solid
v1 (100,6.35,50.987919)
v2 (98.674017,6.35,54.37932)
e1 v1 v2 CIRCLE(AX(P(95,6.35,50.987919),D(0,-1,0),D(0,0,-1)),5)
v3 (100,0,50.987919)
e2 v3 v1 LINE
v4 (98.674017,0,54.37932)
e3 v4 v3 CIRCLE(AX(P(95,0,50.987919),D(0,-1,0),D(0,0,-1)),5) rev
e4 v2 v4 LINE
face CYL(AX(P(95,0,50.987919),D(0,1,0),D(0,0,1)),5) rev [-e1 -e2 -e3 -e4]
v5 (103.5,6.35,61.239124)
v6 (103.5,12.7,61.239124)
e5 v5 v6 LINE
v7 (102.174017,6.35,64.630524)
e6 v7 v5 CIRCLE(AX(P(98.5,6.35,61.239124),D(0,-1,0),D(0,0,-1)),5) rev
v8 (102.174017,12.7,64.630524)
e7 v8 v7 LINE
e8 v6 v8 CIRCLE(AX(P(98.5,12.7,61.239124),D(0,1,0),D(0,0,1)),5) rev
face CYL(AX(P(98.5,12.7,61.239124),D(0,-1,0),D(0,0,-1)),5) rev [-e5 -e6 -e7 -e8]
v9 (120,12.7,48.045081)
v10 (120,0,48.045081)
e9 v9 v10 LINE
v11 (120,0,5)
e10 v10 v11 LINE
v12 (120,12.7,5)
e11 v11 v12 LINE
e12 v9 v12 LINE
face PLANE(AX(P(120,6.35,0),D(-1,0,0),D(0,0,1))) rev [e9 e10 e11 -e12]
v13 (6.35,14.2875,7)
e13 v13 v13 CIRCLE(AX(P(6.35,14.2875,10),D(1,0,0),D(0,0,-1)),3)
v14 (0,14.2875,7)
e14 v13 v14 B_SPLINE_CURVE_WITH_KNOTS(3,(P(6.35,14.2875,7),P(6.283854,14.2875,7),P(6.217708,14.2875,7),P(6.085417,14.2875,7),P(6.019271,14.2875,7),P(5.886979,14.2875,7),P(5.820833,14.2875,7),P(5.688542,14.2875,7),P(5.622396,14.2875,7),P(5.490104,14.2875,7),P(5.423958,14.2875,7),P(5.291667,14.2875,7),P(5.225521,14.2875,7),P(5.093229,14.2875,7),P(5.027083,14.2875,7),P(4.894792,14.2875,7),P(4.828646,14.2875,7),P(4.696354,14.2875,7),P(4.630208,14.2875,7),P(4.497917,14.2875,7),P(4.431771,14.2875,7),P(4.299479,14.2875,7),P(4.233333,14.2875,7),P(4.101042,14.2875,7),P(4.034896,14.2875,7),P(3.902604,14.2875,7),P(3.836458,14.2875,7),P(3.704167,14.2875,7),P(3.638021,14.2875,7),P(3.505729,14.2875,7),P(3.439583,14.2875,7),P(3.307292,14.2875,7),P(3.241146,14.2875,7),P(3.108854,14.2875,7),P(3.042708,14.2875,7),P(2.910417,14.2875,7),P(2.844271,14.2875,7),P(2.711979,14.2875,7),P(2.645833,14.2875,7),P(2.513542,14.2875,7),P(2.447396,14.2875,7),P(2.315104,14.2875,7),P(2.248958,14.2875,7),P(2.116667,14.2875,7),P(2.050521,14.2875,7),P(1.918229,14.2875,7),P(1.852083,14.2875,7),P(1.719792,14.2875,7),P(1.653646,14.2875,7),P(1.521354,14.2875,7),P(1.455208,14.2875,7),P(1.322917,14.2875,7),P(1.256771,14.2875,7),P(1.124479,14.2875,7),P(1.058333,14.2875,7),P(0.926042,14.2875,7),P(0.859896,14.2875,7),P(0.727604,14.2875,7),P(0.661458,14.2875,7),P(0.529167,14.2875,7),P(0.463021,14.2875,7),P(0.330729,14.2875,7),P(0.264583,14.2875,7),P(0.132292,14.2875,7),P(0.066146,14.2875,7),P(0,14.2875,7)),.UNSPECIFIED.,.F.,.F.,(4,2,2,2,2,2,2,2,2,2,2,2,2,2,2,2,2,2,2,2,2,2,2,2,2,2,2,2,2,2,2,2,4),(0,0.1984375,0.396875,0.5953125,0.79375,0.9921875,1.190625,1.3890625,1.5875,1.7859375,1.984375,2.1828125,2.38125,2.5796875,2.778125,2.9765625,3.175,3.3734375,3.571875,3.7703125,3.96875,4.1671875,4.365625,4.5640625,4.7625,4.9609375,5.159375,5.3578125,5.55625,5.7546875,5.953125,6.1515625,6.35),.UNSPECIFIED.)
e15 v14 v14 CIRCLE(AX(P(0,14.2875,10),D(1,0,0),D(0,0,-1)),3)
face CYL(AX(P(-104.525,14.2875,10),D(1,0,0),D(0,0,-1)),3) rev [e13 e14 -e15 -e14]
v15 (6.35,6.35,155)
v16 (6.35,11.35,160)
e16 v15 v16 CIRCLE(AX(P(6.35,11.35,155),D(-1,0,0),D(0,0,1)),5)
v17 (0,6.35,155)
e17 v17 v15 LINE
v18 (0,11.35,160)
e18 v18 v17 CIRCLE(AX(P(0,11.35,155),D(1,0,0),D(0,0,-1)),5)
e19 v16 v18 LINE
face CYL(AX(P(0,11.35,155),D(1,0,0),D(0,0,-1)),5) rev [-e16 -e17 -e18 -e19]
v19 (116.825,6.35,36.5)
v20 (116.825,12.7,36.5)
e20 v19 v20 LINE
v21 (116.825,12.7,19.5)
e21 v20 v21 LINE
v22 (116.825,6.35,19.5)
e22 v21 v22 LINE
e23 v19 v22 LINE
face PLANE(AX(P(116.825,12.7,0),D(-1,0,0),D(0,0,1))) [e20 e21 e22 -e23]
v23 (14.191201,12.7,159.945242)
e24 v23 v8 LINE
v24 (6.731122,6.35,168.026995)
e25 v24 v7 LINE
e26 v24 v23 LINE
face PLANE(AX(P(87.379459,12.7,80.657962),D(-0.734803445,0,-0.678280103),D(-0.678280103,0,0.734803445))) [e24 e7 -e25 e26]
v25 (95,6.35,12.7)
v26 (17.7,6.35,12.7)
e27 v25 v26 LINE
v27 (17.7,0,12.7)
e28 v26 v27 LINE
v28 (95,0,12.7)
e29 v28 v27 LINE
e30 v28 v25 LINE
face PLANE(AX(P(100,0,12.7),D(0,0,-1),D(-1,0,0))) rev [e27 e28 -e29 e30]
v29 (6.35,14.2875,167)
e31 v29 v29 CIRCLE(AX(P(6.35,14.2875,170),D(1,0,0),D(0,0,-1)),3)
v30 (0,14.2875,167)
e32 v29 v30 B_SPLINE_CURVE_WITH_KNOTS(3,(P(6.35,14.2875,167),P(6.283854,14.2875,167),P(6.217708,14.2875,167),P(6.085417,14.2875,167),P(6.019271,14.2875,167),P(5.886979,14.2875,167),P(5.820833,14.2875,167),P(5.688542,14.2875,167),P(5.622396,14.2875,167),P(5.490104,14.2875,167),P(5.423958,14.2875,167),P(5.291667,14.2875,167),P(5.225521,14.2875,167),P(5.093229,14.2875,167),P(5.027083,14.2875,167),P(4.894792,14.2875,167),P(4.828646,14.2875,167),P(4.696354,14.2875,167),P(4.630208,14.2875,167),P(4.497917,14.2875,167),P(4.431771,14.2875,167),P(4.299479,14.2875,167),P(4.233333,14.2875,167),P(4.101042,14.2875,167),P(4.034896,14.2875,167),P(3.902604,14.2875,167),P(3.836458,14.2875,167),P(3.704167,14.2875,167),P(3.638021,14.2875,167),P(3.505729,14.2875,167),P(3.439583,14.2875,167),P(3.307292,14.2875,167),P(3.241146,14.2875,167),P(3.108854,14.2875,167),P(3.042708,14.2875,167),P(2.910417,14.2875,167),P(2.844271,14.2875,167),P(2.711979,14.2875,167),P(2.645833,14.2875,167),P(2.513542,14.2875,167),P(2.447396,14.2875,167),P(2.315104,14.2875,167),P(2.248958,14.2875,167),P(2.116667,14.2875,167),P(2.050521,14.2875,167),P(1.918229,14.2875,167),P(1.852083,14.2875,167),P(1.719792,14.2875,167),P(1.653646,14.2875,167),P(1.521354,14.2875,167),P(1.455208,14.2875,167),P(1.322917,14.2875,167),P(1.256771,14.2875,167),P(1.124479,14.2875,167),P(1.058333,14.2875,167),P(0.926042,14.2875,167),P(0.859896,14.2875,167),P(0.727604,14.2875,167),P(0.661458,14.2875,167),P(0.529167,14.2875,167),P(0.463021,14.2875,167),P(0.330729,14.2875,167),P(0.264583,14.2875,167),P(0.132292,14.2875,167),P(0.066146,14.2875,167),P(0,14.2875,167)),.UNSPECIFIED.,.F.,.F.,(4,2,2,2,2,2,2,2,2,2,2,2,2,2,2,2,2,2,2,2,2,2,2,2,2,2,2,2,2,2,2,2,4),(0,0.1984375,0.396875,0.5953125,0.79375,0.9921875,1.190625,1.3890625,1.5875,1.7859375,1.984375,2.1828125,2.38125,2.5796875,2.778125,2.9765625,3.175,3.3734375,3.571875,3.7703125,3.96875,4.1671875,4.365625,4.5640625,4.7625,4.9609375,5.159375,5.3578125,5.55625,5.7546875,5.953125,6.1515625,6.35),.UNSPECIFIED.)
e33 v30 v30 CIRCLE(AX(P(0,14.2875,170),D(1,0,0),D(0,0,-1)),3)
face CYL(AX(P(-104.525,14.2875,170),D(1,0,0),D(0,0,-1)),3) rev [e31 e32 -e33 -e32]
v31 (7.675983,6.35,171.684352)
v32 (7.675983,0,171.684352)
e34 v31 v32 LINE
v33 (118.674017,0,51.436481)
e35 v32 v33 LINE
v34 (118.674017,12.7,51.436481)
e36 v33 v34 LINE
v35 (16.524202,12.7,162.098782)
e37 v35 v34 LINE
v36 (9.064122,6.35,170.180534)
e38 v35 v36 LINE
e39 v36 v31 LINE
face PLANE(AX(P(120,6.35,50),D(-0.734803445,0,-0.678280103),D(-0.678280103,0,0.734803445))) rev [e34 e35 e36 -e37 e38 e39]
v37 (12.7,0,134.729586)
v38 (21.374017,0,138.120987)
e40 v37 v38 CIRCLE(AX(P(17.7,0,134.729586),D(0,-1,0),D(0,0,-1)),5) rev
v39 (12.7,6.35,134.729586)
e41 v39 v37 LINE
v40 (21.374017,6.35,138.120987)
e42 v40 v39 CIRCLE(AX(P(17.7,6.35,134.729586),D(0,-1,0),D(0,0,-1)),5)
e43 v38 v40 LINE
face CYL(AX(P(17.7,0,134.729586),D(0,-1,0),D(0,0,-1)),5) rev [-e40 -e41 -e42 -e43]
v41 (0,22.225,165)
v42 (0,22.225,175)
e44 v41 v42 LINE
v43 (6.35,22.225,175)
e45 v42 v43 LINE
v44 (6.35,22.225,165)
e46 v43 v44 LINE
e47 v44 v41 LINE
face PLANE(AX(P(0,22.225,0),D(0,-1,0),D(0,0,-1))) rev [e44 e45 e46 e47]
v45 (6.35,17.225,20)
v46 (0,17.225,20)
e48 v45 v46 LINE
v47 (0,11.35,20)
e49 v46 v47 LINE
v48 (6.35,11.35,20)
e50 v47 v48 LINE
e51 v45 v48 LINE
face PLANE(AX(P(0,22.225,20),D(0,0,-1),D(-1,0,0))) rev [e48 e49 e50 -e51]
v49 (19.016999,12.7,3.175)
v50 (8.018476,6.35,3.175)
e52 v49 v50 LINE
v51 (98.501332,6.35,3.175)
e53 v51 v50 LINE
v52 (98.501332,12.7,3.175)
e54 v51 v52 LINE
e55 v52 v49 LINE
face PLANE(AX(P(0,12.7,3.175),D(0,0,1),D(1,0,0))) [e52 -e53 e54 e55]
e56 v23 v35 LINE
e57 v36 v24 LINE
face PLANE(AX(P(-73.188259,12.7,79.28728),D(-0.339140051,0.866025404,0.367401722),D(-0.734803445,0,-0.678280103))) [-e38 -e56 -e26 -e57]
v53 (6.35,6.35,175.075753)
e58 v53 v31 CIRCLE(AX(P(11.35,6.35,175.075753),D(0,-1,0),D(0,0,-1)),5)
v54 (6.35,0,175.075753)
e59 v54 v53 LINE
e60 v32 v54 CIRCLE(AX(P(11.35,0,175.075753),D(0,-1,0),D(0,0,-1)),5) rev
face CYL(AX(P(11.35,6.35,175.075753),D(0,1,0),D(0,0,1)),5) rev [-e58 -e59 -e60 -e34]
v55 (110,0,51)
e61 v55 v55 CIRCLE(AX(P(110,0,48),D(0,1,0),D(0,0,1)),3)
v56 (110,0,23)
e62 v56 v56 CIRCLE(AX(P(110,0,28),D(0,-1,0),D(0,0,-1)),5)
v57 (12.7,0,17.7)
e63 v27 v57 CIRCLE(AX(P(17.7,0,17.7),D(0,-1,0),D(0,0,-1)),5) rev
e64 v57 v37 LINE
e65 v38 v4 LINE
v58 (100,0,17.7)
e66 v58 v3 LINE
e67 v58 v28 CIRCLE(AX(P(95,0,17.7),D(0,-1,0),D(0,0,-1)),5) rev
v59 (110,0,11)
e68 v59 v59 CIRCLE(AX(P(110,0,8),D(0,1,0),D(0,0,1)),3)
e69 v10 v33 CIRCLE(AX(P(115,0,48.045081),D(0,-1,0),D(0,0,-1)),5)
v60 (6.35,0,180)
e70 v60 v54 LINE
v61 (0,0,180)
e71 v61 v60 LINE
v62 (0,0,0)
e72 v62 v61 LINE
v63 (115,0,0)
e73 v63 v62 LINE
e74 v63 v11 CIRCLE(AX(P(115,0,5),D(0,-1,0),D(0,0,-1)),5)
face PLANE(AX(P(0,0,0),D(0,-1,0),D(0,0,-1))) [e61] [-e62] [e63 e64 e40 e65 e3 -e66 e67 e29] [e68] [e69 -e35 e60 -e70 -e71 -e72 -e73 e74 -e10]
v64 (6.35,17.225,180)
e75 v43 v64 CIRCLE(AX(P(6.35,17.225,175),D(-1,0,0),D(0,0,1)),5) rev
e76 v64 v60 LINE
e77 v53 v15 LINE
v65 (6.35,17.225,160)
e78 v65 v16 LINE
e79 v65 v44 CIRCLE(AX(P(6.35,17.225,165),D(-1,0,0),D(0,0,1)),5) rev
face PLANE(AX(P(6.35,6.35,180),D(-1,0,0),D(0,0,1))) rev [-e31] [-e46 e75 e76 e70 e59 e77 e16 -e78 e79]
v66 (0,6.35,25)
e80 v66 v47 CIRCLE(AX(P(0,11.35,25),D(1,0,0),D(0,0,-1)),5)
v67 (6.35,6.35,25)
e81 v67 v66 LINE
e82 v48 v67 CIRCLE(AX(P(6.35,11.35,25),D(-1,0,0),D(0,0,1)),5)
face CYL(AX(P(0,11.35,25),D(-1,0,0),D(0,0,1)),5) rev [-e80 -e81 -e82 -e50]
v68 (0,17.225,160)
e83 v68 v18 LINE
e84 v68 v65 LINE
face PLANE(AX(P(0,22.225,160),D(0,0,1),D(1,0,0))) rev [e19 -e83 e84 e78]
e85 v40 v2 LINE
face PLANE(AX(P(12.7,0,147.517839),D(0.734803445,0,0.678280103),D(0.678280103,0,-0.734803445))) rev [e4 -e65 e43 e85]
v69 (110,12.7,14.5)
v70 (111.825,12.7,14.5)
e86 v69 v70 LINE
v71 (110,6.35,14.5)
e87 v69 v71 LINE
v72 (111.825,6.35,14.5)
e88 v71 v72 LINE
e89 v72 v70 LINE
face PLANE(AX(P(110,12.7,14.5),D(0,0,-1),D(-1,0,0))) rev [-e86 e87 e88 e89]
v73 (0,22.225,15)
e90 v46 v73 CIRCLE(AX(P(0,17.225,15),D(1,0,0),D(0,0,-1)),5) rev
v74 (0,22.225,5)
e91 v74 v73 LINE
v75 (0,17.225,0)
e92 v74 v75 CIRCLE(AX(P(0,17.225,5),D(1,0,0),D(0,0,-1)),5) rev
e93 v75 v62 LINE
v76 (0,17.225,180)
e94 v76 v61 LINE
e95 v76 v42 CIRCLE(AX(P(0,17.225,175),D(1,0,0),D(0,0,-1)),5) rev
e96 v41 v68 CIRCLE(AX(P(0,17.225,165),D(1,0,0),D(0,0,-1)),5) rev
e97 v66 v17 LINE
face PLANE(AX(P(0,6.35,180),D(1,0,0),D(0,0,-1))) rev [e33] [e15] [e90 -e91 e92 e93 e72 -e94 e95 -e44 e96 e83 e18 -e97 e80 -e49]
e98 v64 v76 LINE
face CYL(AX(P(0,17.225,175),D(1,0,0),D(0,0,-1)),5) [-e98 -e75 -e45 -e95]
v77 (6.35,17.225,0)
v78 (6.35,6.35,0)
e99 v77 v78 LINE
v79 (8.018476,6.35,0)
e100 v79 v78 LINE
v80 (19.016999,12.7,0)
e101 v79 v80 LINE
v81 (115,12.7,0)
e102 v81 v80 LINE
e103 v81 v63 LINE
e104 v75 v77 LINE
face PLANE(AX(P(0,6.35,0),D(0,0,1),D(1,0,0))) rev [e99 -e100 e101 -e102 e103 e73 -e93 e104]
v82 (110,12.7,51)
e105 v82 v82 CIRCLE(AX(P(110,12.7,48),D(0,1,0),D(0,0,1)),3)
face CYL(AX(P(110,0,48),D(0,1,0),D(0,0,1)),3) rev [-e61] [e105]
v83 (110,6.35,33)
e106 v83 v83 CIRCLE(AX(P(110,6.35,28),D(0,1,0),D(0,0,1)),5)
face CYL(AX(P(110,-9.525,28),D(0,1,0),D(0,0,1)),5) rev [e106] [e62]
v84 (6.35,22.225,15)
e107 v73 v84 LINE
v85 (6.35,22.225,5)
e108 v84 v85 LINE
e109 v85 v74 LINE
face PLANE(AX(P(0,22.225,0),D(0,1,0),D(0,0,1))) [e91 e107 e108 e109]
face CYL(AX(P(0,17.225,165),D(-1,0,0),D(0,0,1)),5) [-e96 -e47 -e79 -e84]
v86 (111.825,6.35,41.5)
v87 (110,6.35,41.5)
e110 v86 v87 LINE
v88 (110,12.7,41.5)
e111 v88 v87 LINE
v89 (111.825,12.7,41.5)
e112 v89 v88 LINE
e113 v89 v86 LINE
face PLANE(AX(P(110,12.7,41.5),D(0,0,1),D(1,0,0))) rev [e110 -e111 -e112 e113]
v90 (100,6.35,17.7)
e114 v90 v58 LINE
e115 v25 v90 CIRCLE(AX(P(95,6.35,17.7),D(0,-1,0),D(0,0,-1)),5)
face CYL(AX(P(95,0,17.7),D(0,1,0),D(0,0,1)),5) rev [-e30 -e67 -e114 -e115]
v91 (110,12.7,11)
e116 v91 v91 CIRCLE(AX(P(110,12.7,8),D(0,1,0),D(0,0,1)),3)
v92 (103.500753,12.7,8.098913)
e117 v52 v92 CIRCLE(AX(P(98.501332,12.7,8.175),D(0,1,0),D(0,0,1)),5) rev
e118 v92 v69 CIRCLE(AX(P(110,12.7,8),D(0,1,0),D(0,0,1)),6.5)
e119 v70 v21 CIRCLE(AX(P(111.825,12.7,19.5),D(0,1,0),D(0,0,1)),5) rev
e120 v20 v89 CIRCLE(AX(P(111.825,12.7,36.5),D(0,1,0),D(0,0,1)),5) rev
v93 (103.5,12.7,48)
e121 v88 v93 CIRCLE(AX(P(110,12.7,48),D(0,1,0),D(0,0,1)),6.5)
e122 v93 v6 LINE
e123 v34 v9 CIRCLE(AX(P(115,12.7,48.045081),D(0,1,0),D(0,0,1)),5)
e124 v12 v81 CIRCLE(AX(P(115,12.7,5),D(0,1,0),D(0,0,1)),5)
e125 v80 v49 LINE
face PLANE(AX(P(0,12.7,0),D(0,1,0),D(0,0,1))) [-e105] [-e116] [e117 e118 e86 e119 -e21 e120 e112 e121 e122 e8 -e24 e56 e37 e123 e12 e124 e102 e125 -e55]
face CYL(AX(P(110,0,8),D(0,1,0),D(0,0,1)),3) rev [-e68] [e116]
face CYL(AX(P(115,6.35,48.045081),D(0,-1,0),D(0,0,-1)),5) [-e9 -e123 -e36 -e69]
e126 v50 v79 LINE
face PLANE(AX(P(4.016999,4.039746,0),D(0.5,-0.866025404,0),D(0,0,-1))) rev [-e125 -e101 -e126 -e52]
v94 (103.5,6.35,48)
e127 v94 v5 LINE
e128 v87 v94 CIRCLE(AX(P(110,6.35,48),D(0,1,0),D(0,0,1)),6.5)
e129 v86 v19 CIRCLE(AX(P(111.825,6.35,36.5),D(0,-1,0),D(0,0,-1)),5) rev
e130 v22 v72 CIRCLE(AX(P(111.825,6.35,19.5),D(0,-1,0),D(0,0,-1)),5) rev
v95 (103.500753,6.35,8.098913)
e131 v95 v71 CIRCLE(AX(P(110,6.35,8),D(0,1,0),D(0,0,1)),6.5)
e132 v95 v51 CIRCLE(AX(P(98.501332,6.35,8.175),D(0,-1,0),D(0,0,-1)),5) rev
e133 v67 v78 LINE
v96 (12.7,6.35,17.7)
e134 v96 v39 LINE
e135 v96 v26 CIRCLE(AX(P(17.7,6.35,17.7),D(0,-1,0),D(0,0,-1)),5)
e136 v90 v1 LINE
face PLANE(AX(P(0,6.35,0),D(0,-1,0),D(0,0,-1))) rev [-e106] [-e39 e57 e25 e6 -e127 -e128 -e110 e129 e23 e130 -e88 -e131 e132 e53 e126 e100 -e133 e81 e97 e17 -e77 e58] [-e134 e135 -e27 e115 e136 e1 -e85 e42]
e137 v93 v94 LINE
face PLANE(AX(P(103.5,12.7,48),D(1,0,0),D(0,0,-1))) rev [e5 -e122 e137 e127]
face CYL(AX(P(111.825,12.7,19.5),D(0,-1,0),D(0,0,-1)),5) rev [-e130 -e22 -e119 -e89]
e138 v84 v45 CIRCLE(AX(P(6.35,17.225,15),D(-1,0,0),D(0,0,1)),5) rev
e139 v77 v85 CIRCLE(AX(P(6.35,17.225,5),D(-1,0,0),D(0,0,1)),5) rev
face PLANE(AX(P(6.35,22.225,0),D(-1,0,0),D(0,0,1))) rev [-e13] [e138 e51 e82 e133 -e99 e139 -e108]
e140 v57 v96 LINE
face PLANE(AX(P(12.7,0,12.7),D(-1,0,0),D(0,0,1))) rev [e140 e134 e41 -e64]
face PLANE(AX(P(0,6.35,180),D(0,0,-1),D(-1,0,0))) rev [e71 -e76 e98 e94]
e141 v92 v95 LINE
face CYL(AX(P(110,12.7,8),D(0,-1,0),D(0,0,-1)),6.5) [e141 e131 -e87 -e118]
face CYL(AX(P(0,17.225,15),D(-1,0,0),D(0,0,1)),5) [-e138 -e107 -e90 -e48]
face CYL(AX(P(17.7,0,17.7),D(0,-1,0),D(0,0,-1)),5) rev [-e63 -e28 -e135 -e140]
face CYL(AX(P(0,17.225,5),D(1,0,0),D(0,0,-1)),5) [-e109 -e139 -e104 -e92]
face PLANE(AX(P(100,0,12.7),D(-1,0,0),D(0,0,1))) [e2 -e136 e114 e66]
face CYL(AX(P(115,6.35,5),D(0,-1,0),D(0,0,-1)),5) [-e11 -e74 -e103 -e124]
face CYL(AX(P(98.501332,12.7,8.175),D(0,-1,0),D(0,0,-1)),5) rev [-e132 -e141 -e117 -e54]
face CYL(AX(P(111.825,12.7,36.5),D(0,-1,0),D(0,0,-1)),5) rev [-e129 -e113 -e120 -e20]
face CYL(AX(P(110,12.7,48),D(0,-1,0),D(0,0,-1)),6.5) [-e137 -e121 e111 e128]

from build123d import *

# Parameters (mm, degrees)
BOSS_EXTRUDE1_DEPTH = 6.35
SKETCH2_R           = 3
CUT_EXTRUDE3_DEPTH  = 217.426251873
BOSS_EXTRUDE3_DEPTH = 6.35
CHAMFER1_SIZE       = 8.660254038
CHAMFER1_SIZE_2     = 15
BOSS_EXTRUDE4_START = 6.35
SKETCH8_R           = 3
BOSS_EXTRUDE4_DEPTH = 6.35
SKETCH9_W           = 6.35
SKETCH9_H           = 20
BOSS_EXTRUDE5_DEPTH = 15.875
SKETCH10_R          = 3
CUT_EXTRUDE4_DEPTH  = 110.875
FILLET3_R           = 5
SKETCH11_R          = 5
CUT_EXTRUDE5_DEPTH  = 15.875


with BuildPart() as part:
    # Sketch1 → Boss-Extrude1 (new body)
    with BuildSketch(Plane(origin=(0, 0, 0), x_dir=(1, 0, 0), z_dir=(0, 1, 0))):
        Polygon((0, 0), (120, 0), (120, -50), (6.35, -173.120833333), (6.35, -180), (0, -180), align=None)
    extrude(amount=BOSS_EXTRUDE1_DEPTH)

    # Sketch2 → Cut-Extrude3 (cut, through all)
    with BuildSketch(Plane(origin=(0, 6.35, 0), x_dir=(1, 0, 0), z_dir=(0, 1, 0))):
        with Locations(Location((110, -8, 0), (0, 0, 270))):
            Circle(SKETCH2_R)
        with Locations(Location((110, -48, 0), (0, 0, 270))):
            Circle(SKETCH2_R)
        Polygon((100, -12.7), (100, -52.942838636), (12.7, -147.517838636), (12.7, -12.7), align=None)
    extrude(amount=-CUT_EXTRUDE3_DEPTH, mode=Mode.SUBTRACT)

    # Sketch7 → Boss-Extrude3 (add)
    with BuildSketch(Plane(origin=(0, 6.35, 0), x_dir=(1, 0, 0), z_dir=(0, 1, 0))):
        Polygon((116.825, -48.758626326), (4.016999063, -170.967294007), (6.35, -173.120833333), (120, -50), (120, 0), (4.016999063, 0), (4.016999063, -3.175), (116.825, -3.175), align=None)
    extrude(amount=BOSS_EXTRUDE3_DEPTH)

    # Chamfer1
    # the kernel refuses this chamfer: 15, 8.660254038 mm, written as the material it takes off along each edge
    with BuildSketch(Plane(origin=(-24.497993798, 12.7, 144.645762136), x_dir=(-0.03926825493809675, -0.9983227437537926, 0.04254060951627175), z_dir=(0.73480344462749, 0, 0.6782801027330635))) as chamfer1_piece_1_section:
        Polygon((CHAMFER1_SIZE * 0.998322743736, CHAMFER1_SIZE * 0.0578938624016), (-CHAMFER1_SIZE_2 * 0.0578938624027, CHAMFER1_SIZE_2 * 0.998322743754), (0, 0), align=None)
    chamfer1_piece_1 = extrude(amount=80.787572639, mode=Mode.PRIVATE)
    chamfer1_piece_1 = split(chamfer1_piece_1, bisect_by=Plane(origin=(8.850305535, 6.35, 168.0716905), z_dir=(0, 1, 0)), keep=Keep.TOP, mode=Mode.PRIVATE)
    add(chamfer1_piece_1, mode=Mode.SUBTRACT)
    with BuildSketch(Plane(origin=(4.016999063, 12.7, -38.80628632), x_dir=(0.9998132206222079, 0.019326765612700747, 0), z_dir=(0, 0, 1))) as chamfer1_piece_2_section:
        Polygon((CHAMFER1_SIZE_2 * 0.999813220622, -CHAMFER1_SIZE_2 * 0.0193267656127), (-CHAMFER1_SIZE * 0.0193267656124, -CHAMFER1_SIZE * 0.999813220604), (0, 0), align=None)
    chamfer1_piece_2 = extrude(amount=80.787572639, mode=Mode.PRIVATE)
    chamfer1_piece_2 = split(chamfer1_piece_2, bisect_by=Plane(origin=(9.423034105, 6.35, 1.5875), z_dir=(0, 1, 0)), keep=Keep.TOP, mode=Mode.PRIVATE)
    add(chamfer1_piece_2, mode=Mode.SUBTRACT)

    # Sketch8 → Boss-Extrude4 (add)
    # profile 1 of 2: a face of its own
    with BuildSketch(Plane(origin=(0, 6.35, 0), x_dir=(1, 0, 0), z_dir=(0, 1, 0)).offset(BOSS_EXTRUDE4_START)):
        with BuildLine():
            Line((110, -14.5), (116.825, -14.5))
            Line((116.825, -14.5), (116.825, -3.175))
            Line((116.825, -3.175), (103.5, -3.175))
            Line((103.5, -3.175), (103.5, -8))
            ThreePointArc((103.5, -8), (105.403805922, -12.596194078), (110, -14.5))
        make_face()
        with Locations(Location((110, -8, 0), (0, 0, 270))):
            Circle(SKETCH8_R, mode=Mode.SUBTRACT)
    # profile 2 of 2: a face of its own
    with BuildSketch(Plane(origin=(0, 6.35, 0), x_dir=(1, 0, 0), z_dir=(0, 1, 0)).offset(BOSS_EXTRUDE4_START)):
        with BuildLine():
            Line((110, -41.5), (116.825, -41.5))
            Line((116.825, -41.5), (116.825, -48.758626326))
            Line((116.825, -48.758626326), (103.5, -63.194042992))
            Line((103.5, -63.194042992), (103.5, -48))
            ThreePointArc((103.5, -48), (105.403805922, -43.403805922), (110, -41.5))
        make_face()
        with Locations(Location((110, -48, 0), (0, 0, 270))):
            Circle(SKETCH8_R, mode=Mode.SUBTRACT)
    extrude(amount=-BOSS_EXTRUDE4_DEPTH)

    # Sketch9 → Boss-Extrude5 (add)
    with BuildSketch(Plane(origin=(0, 6.35, 0), x_dir=(1, 0, 0), z_dir=(0, 1, 0))):
        with Locations((3.175, -10)):
            Rectangle(SKETCH9_W, SKETCH9_H)
        with Locations((3.175, -170)):
            Rectangle(SKETCH9_W, SKETCH9_H)
    extrude(amount=BOSS_EXTRUDE5_DEPTH)

    # Sketch10 → Cut-Extrude4 (cut)
    with BuildSketch(Plane(origin=(6.35, 0, 0), x_dir=(0, 0, -1), z_dir=(1, 0, 0))):
        with Locations((-10, 14.2875)):
            Circle(SKETCH10_R)
        with Locations((-170, 14.2875)):
            Circle(SKETCH10_R)
    extrude(amount=-CUT_EXTRUDE4_DEPTH, mode=Mode.SUBTRACT)

    # Fillet3
    fillet3_edges = [part.edges().sort_by_distance(p)[0] for p in [
        (103.5, 9.525, 63.194042992),
        (116.825, 9.525, 41.5),
        (116.825, 9.525, 14.5),
        (103.5, 9.525, 3.175),
        (120, 6.35, 0),
        (120, 6.35, 50),
        (6.35, 3.175, 173.120833333),
        (12.7, 3.175, 147.517838636),
        (100, 3.175, 52.942838636),
        (100, 3.175, 12.7),
        (12.7, 3.175, 12.7),
        (3.175, 22.225, 180),
        (3.175, 6.35, 160),
        (3.175, 22.225, 160),
        (3.175, 22.225, 0),
        (3.175, 22.225, 20),
        (3.175, 6.35, 20),
    ]]
    fillet(fillet3_edges, radius=FILLET3_R)

    # Sketch11 → Cut-Extrude5 (cut)
    with BuildSketch(Plane(origin=(0, 6.35, 0), x_dir=(1, 0, 0), z_dir=(0, 1, 0))):
        with Locations(Location((110, -28, 0), (0, 0, 270))):
            Circle(SKETCH11_R)
    extrude(amount=-CUT_EXTRUDE5_DEPTH, mode=Mode.SUBTRACT)


solid = part.part
